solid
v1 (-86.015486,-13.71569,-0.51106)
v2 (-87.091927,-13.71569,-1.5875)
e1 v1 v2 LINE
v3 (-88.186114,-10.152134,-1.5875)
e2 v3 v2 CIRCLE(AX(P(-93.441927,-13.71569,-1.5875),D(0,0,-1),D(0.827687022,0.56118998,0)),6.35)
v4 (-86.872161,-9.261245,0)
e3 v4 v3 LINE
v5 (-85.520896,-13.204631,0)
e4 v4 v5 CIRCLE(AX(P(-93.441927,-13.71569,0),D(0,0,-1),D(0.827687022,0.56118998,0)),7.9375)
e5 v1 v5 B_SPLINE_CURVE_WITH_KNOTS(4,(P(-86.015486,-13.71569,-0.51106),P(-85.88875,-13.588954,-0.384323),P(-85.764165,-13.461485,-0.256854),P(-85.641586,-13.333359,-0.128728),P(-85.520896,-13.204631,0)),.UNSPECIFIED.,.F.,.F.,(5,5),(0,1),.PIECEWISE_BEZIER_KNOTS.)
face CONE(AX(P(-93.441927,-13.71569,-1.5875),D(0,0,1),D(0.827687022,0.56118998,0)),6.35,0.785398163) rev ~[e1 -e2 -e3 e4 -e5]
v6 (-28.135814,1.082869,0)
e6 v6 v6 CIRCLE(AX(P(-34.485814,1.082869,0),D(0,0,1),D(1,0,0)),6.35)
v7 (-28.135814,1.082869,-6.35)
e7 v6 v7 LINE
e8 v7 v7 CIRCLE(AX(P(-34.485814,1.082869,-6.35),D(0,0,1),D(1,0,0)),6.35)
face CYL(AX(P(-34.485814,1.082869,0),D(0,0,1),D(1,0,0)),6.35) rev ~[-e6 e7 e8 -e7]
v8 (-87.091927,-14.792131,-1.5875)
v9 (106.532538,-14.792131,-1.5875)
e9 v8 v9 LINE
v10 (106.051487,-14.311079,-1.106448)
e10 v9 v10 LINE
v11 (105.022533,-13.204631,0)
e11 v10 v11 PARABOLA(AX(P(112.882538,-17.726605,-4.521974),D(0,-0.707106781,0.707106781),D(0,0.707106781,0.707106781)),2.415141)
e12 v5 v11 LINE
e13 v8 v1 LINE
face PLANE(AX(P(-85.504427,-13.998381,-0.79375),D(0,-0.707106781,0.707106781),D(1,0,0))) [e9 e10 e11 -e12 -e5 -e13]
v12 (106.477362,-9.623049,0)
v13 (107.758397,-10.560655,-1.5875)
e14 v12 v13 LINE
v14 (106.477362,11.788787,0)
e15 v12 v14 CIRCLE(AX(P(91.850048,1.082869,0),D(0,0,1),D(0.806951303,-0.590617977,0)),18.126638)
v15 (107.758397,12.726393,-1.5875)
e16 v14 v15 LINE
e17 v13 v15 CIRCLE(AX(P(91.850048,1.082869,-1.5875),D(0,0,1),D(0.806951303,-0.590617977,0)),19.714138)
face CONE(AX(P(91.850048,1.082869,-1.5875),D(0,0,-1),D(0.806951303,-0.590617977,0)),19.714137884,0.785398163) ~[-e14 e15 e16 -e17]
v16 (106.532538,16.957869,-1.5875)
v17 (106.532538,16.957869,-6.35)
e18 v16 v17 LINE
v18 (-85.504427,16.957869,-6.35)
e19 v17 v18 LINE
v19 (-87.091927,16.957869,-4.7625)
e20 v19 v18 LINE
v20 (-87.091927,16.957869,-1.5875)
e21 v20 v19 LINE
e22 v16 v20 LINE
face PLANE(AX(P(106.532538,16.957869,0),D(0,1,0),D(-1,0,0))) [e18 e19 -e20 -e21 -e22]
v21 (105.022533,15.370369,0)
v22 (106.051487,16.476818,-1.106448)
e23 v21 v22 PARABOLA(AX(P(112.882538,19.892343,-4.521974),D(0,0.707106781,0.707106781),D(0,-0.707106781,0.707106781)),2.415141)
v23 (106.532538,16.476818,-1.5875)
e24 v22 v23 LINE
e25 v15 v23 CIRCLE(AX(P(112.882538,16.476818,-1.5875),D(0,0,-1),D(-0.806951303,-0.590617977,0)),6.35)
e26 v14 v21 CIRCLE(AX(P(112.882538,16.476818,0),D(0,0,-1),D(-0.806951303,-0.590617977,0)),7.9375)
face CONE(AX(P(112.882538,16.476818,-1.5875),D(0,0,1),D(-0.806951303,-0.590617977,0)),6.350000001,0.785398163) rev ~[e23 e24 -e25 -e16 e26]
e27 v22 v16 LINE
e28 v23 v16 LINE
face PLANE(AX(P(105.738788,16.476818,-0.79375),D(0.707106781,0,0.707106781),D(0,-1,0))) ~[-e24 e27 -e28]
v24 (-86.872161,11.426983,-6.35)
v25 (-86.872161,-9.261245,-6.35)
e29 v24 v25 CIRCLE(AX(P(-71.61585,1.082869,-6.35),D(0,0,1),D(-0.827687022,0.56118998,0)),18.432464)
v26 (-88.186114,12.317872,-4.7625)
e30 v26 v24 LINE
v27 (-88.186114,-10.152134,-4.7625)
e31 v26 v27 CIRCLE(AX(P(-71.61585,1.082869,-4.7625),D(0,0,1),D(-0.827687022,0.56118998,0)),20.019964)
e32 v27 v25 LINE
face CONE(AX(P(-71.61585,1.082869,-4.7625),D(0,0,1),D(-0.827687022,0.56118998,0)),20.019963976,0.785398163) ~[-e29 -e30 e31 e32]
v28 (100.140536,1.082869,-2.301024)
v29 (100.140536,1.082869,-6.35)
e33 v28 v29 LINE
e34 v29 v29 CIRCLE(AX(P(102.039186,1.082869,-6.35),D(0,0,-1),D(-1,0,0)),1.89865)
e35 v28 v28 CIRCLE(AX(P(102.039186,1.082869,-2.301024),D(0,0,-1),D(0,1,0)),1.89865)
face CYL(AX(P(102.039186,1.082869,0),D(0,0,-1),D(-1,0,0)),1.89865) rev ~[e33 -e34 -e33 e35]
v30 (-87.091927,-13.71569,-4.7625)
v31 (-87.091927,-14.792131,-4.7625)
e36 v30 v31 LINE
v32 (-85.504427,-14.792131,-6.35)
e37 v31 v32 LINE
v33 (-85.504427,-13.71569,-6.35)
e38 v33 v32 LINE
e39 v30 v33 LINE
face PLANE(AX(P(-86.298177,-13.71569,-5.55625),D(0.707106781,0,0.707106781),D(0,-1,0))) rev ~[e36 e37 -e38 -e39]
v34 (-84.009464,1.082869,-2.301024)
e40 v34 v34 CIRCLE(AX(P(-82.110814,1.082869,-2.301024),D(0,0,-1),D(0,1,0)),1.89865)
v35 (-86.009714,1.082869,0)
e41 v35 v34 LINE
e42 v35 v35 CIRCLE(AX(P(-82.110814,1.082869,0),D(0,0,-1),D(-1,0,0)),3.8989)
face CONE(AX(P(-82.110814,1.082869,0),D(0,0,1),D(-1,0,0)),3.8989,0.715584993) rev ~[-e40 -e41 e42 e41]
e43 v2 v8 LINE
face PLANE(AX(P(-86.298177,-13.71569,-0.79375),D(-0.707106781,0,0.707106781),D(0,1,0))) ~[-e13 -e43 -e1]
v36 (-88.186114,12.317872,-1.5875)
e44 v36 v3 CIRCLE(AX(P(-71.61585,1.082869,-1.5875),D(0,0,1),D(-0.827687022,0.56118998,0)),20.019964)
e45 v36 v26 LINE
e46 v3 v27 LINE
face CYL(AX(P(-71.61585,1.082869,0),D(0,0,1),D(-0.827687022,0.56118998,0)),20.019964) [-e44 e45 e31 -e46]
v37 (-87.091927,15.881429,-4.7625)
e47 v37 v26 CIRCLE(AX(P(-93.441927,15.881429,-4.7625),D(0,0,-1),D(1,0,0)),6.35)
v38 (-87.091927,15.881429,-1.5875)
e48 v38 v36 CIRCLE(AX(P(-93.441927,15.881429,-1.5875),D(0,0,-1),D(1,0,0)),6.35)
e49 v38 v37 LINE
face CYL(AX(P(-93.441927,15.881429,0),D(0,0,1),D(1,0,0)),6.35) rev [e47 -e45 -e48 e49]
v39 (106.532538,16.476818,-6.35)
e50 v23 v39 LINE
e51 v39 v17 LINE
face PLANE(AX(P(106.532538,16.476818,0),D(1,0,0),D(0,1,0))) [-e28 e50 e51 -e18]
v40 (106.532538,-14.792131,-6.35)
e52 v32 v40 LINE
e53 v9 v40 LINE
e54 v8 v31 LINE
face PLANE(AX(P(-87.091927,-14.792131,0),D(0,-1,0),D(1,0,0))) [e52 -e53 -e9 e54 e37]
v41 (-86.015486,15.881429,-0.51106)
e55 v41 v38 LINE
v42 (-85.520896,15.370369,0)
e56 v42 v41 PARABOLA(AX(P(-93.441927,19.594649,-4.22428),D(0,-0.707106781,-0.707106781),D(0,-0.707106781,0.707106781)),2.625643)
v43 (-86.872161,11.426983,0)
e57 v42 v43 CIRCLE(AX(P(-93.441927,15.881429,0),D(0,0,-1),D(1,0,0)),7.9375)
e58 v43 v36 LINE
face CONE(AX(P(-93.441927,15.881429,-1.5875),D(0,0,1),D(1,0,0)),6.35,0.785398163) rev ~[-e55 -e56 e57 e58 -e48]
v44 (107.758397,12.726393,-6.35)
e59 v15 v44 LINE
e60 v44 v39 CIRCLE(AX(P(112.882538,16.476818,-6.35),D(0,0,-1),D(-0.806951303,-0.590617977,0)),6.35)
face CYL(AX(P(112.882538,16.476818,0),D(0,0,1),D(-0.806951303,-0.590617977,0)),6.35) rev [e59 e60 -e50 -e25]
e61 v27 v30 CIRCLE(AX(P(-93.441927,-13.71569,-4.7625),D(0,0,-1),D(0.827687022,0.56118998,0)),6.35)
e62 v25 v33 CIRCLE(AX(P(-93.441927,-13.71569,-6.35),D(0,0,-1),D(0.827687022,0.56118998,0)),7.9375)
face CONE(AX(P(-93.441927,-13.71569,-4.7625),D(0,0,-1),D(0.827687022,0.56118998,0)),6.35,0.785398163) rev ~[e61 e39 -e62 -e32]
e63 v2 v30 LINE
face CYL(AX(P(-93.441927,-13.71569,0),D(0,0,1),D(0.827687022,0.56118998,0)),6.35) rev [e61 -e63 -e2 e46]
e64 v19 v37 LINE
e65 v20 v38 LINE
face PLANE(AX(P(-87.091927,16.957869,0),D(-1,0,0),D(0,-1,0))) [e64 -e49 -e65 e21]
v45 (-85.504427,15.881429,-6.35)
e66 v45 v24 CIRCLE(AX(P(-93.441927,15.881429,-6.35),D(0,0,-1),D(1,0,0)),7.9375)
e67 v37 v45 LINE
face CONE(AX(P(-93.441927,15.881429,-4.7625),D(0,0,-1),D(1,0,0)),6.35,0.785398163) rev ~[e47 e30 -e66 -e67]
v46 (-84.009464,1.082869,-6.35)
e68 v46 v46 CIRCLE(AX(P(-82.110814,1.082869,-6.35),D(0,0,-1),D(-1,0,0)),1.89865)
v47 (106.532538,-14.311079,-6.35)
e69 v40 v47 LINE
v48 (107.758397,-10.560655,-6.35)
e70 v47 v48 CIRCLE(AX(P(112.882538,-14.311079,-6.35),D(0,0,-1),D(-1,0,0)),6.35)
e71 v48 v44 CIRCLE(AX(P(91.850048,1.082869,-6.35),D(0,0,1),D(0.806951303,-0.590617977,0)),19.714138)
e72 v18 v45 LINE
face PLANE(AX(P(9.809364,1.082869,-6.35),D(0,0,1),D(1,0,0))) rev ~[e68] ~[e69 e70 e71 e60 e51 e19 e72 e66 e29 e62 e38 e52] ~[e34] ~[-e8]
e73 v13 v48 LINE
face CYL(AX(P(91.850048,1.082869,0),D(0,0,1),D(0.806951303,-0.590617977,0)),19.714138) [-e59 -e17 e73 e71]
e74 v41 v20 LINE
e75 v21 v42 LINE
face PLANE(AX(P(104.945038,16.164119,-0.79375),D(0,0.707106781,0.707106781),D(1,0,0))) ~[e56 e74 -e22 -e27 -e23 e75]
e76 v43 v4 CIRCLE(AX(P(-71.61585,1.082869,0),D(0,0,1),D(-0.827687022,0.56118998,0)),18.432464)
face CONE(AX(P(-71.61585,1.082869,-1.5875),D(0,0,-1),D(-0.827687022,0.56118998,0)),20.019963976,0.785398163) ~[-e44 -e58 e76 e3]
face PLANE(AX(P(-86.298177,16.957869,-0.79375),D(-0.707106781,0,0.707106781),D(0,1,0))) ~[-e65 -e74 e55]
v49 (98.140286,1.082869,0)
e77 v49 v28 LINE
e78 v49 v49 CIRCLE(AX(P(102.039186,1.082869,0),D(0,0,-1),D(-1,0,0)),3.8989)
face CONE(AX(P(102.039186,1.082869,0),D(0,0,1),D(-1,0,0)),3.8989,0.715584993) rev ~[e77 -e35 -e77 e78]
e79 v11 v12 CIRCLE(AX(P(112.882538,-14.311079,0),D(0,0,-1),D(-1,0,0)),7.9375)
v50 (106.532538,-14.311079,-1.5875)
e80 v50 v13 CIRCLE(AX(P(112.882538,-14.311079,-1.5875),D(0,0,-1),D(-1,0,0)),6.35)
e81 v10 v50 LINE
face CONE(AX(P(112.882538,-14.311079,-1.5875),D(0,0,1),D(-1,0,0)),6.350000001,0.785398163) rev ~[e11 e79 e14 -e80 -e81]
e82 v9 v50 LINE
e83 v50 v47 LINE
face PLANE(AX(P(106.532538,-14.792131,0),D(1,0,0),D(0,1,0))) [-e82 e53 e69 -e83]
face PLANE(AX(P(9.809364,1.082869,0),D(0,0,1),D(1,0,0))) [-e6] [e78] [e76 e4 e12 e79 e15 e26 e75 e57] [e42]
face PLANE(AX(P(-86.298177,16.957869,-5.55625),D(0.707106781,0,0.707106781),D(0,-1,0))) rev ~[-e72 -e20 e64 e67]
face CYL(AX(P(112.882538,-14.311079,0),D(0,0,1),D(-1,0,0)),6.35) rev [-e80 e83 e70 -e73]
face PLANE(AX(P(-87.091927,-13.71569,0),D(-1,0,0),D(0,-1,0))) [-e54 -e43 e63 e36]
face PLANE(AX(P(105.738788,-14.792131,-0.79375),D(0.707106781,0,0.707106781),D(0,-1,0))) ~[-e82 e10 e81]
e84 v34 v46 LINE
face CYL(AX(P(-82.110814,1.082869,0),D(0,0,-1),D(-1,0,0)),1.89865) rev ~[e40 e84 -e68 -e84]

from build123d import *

# Parameters (mm, degrees)
F0_R           = 6.35
F1_DEPTH       = 6.35
F2_D           = 3.7973
F2_CSINK_D     = 7.7978
F2_CSINK_ANGLE = 82
F3_C1_SIZE     = 1.5875
F3_C2_SIZE     = 1.5875
F3_C3_SIZE     = 1.5875
F3_C4_SIZE     = 1.5875
F3_C5_SIZE     = 1.5875


with BuildPart() as f1:
    # F0 (on Top) → F1 (new body)
    with BuildSketch(Plane.XY):
        with BuildLine():
            Line((-87.0919269209, -13.7156903623), (-87.0919269209, -14.792130794))
            Line((-87.0919269209, -14.792130794), (106.5325381816, -14.792130794))
            Line((106.5325381816, -14.792130794), (106.5325381816, -14.3110791923))
            ThreePointArc((106.5325381816, -14.3110791923), (106.846778333, -12.3382378278), (107.7583974098, -10.5606550362))
            ThreePointArc((107.7583974098, -10.5606550362), (111.5641860478, 1.082869206), (107.7583974098, 12.7263934482))
            ThreePointArc((107.7583974098, 12.7263934482), (106.846778333, 14.5039762398), (106.5325381816, 16.4768176043))
            Line((106.5325381816, 16.4768176043), (106.5325381816, 16.957869206))
            Line((106.5325381816, 16.957869206), (-87.0919269209, 16.957869206))
            Line((-87.0919269209, 16.957869206), (-87.0919269209, 15.8814287743))
            ThreePointArc((-87.0919269209, 15.8814287743), (-87.3716340972, 14.0175497454), (-88.1861143334, 12.3178723984))
            ThreePointArc((-88.1861143334, 12.3178723984), (-91.6358139522, 1.082869206), (-88.1861143334, -10.1521339864))
            ThreePointArc((-88.1861143334, -10.1521339864), (-87.3716340972, -11.8518113334), (-87.0919269209, -13.7156903623))
        make_face()
        with Locations((-34.4858139522, 1.082869206)):
            Circle(F0_R, mode=Mode.SUBTRACT)
    extrude(amount=-F1_DEPTH)

    # F2 (through all)
    with Locations(Plane.XY):
        with Locations((102.0391860478, 1.082869206), (-82.1108139522, 1.082869206)):
            CounterSinkHole(F2_D / 2, F2_CSINK_D / 2, counter_sink_angle=F2_CSINK_ANGLE)

    # F3: chamfer of 1.5875 on 9 edges, made by hand

    # F3_c1
    f3_c1_edges = [f1.edges().sort_by_distance(p)[0] for p in [
        (-87.3716340972, -11.8518113334, 0),
        (-91.6358139522, 1.082869206, 0),
        (-87.0919269209, -14.2539105781, 0),
        (-87.3716340972, 14.0175497454, 0),
        (-87.0919269209, 16.4196489902, 0),
    ]]
    chamfer(f3_c1_edges, length=F3_C1_SIZE)

    # F3_c2
    f3_c2_edges = [f1.edges().sort_by_distance(p)[0] for p in [
        (-87.3716340972, -11.8518113334, -6.35),
        (-91.6358139522, 1.082869206, -6.35),
        (-87.0919269209, -14.2539105781, -6.35),
        (-87.3716340972, 14.0175497454, -6.35),
        (-87.0919269209, 16.4196489902, -6.35),
    ]]
    chamfer(f3_c2_edges, length=F3_C2_SIZE)

    # F3_c3
    f3_c3_edges = [f1.edges().sort_by_distance(p)[0] for p in [
        (106.5325381816, -14.5516049932, 0),
        (106.846778333, -12.3382378278, 0),
        (106.5325381816, 16.7173434052, 0),
        (111.5641860478, 1.082869206, 0),
        (106.846778333, 14.5039762398, 0),
    ]]
    chamfer(f3_c3_edges, length=F3_C3_SIZE)

    # F3_c4
    f3_c4_edges = [f1.edges().sort_by_distance(p)[0] for p in [
        (9.7203056303, -14.792130794, 0),
    ]]
    chamfer(f3_c4_edges, length=F3_C4_SIZE)

    # F3_c5
    f3_c5_edges = [f1.edges().sort_by_distance(p)[0] for p in [
        (9.7203056303, 16.957869206, 0),
    ]]
    chamfer(f3_c5_edges, length=F3_C5_SIZE)


solid = f1.part
